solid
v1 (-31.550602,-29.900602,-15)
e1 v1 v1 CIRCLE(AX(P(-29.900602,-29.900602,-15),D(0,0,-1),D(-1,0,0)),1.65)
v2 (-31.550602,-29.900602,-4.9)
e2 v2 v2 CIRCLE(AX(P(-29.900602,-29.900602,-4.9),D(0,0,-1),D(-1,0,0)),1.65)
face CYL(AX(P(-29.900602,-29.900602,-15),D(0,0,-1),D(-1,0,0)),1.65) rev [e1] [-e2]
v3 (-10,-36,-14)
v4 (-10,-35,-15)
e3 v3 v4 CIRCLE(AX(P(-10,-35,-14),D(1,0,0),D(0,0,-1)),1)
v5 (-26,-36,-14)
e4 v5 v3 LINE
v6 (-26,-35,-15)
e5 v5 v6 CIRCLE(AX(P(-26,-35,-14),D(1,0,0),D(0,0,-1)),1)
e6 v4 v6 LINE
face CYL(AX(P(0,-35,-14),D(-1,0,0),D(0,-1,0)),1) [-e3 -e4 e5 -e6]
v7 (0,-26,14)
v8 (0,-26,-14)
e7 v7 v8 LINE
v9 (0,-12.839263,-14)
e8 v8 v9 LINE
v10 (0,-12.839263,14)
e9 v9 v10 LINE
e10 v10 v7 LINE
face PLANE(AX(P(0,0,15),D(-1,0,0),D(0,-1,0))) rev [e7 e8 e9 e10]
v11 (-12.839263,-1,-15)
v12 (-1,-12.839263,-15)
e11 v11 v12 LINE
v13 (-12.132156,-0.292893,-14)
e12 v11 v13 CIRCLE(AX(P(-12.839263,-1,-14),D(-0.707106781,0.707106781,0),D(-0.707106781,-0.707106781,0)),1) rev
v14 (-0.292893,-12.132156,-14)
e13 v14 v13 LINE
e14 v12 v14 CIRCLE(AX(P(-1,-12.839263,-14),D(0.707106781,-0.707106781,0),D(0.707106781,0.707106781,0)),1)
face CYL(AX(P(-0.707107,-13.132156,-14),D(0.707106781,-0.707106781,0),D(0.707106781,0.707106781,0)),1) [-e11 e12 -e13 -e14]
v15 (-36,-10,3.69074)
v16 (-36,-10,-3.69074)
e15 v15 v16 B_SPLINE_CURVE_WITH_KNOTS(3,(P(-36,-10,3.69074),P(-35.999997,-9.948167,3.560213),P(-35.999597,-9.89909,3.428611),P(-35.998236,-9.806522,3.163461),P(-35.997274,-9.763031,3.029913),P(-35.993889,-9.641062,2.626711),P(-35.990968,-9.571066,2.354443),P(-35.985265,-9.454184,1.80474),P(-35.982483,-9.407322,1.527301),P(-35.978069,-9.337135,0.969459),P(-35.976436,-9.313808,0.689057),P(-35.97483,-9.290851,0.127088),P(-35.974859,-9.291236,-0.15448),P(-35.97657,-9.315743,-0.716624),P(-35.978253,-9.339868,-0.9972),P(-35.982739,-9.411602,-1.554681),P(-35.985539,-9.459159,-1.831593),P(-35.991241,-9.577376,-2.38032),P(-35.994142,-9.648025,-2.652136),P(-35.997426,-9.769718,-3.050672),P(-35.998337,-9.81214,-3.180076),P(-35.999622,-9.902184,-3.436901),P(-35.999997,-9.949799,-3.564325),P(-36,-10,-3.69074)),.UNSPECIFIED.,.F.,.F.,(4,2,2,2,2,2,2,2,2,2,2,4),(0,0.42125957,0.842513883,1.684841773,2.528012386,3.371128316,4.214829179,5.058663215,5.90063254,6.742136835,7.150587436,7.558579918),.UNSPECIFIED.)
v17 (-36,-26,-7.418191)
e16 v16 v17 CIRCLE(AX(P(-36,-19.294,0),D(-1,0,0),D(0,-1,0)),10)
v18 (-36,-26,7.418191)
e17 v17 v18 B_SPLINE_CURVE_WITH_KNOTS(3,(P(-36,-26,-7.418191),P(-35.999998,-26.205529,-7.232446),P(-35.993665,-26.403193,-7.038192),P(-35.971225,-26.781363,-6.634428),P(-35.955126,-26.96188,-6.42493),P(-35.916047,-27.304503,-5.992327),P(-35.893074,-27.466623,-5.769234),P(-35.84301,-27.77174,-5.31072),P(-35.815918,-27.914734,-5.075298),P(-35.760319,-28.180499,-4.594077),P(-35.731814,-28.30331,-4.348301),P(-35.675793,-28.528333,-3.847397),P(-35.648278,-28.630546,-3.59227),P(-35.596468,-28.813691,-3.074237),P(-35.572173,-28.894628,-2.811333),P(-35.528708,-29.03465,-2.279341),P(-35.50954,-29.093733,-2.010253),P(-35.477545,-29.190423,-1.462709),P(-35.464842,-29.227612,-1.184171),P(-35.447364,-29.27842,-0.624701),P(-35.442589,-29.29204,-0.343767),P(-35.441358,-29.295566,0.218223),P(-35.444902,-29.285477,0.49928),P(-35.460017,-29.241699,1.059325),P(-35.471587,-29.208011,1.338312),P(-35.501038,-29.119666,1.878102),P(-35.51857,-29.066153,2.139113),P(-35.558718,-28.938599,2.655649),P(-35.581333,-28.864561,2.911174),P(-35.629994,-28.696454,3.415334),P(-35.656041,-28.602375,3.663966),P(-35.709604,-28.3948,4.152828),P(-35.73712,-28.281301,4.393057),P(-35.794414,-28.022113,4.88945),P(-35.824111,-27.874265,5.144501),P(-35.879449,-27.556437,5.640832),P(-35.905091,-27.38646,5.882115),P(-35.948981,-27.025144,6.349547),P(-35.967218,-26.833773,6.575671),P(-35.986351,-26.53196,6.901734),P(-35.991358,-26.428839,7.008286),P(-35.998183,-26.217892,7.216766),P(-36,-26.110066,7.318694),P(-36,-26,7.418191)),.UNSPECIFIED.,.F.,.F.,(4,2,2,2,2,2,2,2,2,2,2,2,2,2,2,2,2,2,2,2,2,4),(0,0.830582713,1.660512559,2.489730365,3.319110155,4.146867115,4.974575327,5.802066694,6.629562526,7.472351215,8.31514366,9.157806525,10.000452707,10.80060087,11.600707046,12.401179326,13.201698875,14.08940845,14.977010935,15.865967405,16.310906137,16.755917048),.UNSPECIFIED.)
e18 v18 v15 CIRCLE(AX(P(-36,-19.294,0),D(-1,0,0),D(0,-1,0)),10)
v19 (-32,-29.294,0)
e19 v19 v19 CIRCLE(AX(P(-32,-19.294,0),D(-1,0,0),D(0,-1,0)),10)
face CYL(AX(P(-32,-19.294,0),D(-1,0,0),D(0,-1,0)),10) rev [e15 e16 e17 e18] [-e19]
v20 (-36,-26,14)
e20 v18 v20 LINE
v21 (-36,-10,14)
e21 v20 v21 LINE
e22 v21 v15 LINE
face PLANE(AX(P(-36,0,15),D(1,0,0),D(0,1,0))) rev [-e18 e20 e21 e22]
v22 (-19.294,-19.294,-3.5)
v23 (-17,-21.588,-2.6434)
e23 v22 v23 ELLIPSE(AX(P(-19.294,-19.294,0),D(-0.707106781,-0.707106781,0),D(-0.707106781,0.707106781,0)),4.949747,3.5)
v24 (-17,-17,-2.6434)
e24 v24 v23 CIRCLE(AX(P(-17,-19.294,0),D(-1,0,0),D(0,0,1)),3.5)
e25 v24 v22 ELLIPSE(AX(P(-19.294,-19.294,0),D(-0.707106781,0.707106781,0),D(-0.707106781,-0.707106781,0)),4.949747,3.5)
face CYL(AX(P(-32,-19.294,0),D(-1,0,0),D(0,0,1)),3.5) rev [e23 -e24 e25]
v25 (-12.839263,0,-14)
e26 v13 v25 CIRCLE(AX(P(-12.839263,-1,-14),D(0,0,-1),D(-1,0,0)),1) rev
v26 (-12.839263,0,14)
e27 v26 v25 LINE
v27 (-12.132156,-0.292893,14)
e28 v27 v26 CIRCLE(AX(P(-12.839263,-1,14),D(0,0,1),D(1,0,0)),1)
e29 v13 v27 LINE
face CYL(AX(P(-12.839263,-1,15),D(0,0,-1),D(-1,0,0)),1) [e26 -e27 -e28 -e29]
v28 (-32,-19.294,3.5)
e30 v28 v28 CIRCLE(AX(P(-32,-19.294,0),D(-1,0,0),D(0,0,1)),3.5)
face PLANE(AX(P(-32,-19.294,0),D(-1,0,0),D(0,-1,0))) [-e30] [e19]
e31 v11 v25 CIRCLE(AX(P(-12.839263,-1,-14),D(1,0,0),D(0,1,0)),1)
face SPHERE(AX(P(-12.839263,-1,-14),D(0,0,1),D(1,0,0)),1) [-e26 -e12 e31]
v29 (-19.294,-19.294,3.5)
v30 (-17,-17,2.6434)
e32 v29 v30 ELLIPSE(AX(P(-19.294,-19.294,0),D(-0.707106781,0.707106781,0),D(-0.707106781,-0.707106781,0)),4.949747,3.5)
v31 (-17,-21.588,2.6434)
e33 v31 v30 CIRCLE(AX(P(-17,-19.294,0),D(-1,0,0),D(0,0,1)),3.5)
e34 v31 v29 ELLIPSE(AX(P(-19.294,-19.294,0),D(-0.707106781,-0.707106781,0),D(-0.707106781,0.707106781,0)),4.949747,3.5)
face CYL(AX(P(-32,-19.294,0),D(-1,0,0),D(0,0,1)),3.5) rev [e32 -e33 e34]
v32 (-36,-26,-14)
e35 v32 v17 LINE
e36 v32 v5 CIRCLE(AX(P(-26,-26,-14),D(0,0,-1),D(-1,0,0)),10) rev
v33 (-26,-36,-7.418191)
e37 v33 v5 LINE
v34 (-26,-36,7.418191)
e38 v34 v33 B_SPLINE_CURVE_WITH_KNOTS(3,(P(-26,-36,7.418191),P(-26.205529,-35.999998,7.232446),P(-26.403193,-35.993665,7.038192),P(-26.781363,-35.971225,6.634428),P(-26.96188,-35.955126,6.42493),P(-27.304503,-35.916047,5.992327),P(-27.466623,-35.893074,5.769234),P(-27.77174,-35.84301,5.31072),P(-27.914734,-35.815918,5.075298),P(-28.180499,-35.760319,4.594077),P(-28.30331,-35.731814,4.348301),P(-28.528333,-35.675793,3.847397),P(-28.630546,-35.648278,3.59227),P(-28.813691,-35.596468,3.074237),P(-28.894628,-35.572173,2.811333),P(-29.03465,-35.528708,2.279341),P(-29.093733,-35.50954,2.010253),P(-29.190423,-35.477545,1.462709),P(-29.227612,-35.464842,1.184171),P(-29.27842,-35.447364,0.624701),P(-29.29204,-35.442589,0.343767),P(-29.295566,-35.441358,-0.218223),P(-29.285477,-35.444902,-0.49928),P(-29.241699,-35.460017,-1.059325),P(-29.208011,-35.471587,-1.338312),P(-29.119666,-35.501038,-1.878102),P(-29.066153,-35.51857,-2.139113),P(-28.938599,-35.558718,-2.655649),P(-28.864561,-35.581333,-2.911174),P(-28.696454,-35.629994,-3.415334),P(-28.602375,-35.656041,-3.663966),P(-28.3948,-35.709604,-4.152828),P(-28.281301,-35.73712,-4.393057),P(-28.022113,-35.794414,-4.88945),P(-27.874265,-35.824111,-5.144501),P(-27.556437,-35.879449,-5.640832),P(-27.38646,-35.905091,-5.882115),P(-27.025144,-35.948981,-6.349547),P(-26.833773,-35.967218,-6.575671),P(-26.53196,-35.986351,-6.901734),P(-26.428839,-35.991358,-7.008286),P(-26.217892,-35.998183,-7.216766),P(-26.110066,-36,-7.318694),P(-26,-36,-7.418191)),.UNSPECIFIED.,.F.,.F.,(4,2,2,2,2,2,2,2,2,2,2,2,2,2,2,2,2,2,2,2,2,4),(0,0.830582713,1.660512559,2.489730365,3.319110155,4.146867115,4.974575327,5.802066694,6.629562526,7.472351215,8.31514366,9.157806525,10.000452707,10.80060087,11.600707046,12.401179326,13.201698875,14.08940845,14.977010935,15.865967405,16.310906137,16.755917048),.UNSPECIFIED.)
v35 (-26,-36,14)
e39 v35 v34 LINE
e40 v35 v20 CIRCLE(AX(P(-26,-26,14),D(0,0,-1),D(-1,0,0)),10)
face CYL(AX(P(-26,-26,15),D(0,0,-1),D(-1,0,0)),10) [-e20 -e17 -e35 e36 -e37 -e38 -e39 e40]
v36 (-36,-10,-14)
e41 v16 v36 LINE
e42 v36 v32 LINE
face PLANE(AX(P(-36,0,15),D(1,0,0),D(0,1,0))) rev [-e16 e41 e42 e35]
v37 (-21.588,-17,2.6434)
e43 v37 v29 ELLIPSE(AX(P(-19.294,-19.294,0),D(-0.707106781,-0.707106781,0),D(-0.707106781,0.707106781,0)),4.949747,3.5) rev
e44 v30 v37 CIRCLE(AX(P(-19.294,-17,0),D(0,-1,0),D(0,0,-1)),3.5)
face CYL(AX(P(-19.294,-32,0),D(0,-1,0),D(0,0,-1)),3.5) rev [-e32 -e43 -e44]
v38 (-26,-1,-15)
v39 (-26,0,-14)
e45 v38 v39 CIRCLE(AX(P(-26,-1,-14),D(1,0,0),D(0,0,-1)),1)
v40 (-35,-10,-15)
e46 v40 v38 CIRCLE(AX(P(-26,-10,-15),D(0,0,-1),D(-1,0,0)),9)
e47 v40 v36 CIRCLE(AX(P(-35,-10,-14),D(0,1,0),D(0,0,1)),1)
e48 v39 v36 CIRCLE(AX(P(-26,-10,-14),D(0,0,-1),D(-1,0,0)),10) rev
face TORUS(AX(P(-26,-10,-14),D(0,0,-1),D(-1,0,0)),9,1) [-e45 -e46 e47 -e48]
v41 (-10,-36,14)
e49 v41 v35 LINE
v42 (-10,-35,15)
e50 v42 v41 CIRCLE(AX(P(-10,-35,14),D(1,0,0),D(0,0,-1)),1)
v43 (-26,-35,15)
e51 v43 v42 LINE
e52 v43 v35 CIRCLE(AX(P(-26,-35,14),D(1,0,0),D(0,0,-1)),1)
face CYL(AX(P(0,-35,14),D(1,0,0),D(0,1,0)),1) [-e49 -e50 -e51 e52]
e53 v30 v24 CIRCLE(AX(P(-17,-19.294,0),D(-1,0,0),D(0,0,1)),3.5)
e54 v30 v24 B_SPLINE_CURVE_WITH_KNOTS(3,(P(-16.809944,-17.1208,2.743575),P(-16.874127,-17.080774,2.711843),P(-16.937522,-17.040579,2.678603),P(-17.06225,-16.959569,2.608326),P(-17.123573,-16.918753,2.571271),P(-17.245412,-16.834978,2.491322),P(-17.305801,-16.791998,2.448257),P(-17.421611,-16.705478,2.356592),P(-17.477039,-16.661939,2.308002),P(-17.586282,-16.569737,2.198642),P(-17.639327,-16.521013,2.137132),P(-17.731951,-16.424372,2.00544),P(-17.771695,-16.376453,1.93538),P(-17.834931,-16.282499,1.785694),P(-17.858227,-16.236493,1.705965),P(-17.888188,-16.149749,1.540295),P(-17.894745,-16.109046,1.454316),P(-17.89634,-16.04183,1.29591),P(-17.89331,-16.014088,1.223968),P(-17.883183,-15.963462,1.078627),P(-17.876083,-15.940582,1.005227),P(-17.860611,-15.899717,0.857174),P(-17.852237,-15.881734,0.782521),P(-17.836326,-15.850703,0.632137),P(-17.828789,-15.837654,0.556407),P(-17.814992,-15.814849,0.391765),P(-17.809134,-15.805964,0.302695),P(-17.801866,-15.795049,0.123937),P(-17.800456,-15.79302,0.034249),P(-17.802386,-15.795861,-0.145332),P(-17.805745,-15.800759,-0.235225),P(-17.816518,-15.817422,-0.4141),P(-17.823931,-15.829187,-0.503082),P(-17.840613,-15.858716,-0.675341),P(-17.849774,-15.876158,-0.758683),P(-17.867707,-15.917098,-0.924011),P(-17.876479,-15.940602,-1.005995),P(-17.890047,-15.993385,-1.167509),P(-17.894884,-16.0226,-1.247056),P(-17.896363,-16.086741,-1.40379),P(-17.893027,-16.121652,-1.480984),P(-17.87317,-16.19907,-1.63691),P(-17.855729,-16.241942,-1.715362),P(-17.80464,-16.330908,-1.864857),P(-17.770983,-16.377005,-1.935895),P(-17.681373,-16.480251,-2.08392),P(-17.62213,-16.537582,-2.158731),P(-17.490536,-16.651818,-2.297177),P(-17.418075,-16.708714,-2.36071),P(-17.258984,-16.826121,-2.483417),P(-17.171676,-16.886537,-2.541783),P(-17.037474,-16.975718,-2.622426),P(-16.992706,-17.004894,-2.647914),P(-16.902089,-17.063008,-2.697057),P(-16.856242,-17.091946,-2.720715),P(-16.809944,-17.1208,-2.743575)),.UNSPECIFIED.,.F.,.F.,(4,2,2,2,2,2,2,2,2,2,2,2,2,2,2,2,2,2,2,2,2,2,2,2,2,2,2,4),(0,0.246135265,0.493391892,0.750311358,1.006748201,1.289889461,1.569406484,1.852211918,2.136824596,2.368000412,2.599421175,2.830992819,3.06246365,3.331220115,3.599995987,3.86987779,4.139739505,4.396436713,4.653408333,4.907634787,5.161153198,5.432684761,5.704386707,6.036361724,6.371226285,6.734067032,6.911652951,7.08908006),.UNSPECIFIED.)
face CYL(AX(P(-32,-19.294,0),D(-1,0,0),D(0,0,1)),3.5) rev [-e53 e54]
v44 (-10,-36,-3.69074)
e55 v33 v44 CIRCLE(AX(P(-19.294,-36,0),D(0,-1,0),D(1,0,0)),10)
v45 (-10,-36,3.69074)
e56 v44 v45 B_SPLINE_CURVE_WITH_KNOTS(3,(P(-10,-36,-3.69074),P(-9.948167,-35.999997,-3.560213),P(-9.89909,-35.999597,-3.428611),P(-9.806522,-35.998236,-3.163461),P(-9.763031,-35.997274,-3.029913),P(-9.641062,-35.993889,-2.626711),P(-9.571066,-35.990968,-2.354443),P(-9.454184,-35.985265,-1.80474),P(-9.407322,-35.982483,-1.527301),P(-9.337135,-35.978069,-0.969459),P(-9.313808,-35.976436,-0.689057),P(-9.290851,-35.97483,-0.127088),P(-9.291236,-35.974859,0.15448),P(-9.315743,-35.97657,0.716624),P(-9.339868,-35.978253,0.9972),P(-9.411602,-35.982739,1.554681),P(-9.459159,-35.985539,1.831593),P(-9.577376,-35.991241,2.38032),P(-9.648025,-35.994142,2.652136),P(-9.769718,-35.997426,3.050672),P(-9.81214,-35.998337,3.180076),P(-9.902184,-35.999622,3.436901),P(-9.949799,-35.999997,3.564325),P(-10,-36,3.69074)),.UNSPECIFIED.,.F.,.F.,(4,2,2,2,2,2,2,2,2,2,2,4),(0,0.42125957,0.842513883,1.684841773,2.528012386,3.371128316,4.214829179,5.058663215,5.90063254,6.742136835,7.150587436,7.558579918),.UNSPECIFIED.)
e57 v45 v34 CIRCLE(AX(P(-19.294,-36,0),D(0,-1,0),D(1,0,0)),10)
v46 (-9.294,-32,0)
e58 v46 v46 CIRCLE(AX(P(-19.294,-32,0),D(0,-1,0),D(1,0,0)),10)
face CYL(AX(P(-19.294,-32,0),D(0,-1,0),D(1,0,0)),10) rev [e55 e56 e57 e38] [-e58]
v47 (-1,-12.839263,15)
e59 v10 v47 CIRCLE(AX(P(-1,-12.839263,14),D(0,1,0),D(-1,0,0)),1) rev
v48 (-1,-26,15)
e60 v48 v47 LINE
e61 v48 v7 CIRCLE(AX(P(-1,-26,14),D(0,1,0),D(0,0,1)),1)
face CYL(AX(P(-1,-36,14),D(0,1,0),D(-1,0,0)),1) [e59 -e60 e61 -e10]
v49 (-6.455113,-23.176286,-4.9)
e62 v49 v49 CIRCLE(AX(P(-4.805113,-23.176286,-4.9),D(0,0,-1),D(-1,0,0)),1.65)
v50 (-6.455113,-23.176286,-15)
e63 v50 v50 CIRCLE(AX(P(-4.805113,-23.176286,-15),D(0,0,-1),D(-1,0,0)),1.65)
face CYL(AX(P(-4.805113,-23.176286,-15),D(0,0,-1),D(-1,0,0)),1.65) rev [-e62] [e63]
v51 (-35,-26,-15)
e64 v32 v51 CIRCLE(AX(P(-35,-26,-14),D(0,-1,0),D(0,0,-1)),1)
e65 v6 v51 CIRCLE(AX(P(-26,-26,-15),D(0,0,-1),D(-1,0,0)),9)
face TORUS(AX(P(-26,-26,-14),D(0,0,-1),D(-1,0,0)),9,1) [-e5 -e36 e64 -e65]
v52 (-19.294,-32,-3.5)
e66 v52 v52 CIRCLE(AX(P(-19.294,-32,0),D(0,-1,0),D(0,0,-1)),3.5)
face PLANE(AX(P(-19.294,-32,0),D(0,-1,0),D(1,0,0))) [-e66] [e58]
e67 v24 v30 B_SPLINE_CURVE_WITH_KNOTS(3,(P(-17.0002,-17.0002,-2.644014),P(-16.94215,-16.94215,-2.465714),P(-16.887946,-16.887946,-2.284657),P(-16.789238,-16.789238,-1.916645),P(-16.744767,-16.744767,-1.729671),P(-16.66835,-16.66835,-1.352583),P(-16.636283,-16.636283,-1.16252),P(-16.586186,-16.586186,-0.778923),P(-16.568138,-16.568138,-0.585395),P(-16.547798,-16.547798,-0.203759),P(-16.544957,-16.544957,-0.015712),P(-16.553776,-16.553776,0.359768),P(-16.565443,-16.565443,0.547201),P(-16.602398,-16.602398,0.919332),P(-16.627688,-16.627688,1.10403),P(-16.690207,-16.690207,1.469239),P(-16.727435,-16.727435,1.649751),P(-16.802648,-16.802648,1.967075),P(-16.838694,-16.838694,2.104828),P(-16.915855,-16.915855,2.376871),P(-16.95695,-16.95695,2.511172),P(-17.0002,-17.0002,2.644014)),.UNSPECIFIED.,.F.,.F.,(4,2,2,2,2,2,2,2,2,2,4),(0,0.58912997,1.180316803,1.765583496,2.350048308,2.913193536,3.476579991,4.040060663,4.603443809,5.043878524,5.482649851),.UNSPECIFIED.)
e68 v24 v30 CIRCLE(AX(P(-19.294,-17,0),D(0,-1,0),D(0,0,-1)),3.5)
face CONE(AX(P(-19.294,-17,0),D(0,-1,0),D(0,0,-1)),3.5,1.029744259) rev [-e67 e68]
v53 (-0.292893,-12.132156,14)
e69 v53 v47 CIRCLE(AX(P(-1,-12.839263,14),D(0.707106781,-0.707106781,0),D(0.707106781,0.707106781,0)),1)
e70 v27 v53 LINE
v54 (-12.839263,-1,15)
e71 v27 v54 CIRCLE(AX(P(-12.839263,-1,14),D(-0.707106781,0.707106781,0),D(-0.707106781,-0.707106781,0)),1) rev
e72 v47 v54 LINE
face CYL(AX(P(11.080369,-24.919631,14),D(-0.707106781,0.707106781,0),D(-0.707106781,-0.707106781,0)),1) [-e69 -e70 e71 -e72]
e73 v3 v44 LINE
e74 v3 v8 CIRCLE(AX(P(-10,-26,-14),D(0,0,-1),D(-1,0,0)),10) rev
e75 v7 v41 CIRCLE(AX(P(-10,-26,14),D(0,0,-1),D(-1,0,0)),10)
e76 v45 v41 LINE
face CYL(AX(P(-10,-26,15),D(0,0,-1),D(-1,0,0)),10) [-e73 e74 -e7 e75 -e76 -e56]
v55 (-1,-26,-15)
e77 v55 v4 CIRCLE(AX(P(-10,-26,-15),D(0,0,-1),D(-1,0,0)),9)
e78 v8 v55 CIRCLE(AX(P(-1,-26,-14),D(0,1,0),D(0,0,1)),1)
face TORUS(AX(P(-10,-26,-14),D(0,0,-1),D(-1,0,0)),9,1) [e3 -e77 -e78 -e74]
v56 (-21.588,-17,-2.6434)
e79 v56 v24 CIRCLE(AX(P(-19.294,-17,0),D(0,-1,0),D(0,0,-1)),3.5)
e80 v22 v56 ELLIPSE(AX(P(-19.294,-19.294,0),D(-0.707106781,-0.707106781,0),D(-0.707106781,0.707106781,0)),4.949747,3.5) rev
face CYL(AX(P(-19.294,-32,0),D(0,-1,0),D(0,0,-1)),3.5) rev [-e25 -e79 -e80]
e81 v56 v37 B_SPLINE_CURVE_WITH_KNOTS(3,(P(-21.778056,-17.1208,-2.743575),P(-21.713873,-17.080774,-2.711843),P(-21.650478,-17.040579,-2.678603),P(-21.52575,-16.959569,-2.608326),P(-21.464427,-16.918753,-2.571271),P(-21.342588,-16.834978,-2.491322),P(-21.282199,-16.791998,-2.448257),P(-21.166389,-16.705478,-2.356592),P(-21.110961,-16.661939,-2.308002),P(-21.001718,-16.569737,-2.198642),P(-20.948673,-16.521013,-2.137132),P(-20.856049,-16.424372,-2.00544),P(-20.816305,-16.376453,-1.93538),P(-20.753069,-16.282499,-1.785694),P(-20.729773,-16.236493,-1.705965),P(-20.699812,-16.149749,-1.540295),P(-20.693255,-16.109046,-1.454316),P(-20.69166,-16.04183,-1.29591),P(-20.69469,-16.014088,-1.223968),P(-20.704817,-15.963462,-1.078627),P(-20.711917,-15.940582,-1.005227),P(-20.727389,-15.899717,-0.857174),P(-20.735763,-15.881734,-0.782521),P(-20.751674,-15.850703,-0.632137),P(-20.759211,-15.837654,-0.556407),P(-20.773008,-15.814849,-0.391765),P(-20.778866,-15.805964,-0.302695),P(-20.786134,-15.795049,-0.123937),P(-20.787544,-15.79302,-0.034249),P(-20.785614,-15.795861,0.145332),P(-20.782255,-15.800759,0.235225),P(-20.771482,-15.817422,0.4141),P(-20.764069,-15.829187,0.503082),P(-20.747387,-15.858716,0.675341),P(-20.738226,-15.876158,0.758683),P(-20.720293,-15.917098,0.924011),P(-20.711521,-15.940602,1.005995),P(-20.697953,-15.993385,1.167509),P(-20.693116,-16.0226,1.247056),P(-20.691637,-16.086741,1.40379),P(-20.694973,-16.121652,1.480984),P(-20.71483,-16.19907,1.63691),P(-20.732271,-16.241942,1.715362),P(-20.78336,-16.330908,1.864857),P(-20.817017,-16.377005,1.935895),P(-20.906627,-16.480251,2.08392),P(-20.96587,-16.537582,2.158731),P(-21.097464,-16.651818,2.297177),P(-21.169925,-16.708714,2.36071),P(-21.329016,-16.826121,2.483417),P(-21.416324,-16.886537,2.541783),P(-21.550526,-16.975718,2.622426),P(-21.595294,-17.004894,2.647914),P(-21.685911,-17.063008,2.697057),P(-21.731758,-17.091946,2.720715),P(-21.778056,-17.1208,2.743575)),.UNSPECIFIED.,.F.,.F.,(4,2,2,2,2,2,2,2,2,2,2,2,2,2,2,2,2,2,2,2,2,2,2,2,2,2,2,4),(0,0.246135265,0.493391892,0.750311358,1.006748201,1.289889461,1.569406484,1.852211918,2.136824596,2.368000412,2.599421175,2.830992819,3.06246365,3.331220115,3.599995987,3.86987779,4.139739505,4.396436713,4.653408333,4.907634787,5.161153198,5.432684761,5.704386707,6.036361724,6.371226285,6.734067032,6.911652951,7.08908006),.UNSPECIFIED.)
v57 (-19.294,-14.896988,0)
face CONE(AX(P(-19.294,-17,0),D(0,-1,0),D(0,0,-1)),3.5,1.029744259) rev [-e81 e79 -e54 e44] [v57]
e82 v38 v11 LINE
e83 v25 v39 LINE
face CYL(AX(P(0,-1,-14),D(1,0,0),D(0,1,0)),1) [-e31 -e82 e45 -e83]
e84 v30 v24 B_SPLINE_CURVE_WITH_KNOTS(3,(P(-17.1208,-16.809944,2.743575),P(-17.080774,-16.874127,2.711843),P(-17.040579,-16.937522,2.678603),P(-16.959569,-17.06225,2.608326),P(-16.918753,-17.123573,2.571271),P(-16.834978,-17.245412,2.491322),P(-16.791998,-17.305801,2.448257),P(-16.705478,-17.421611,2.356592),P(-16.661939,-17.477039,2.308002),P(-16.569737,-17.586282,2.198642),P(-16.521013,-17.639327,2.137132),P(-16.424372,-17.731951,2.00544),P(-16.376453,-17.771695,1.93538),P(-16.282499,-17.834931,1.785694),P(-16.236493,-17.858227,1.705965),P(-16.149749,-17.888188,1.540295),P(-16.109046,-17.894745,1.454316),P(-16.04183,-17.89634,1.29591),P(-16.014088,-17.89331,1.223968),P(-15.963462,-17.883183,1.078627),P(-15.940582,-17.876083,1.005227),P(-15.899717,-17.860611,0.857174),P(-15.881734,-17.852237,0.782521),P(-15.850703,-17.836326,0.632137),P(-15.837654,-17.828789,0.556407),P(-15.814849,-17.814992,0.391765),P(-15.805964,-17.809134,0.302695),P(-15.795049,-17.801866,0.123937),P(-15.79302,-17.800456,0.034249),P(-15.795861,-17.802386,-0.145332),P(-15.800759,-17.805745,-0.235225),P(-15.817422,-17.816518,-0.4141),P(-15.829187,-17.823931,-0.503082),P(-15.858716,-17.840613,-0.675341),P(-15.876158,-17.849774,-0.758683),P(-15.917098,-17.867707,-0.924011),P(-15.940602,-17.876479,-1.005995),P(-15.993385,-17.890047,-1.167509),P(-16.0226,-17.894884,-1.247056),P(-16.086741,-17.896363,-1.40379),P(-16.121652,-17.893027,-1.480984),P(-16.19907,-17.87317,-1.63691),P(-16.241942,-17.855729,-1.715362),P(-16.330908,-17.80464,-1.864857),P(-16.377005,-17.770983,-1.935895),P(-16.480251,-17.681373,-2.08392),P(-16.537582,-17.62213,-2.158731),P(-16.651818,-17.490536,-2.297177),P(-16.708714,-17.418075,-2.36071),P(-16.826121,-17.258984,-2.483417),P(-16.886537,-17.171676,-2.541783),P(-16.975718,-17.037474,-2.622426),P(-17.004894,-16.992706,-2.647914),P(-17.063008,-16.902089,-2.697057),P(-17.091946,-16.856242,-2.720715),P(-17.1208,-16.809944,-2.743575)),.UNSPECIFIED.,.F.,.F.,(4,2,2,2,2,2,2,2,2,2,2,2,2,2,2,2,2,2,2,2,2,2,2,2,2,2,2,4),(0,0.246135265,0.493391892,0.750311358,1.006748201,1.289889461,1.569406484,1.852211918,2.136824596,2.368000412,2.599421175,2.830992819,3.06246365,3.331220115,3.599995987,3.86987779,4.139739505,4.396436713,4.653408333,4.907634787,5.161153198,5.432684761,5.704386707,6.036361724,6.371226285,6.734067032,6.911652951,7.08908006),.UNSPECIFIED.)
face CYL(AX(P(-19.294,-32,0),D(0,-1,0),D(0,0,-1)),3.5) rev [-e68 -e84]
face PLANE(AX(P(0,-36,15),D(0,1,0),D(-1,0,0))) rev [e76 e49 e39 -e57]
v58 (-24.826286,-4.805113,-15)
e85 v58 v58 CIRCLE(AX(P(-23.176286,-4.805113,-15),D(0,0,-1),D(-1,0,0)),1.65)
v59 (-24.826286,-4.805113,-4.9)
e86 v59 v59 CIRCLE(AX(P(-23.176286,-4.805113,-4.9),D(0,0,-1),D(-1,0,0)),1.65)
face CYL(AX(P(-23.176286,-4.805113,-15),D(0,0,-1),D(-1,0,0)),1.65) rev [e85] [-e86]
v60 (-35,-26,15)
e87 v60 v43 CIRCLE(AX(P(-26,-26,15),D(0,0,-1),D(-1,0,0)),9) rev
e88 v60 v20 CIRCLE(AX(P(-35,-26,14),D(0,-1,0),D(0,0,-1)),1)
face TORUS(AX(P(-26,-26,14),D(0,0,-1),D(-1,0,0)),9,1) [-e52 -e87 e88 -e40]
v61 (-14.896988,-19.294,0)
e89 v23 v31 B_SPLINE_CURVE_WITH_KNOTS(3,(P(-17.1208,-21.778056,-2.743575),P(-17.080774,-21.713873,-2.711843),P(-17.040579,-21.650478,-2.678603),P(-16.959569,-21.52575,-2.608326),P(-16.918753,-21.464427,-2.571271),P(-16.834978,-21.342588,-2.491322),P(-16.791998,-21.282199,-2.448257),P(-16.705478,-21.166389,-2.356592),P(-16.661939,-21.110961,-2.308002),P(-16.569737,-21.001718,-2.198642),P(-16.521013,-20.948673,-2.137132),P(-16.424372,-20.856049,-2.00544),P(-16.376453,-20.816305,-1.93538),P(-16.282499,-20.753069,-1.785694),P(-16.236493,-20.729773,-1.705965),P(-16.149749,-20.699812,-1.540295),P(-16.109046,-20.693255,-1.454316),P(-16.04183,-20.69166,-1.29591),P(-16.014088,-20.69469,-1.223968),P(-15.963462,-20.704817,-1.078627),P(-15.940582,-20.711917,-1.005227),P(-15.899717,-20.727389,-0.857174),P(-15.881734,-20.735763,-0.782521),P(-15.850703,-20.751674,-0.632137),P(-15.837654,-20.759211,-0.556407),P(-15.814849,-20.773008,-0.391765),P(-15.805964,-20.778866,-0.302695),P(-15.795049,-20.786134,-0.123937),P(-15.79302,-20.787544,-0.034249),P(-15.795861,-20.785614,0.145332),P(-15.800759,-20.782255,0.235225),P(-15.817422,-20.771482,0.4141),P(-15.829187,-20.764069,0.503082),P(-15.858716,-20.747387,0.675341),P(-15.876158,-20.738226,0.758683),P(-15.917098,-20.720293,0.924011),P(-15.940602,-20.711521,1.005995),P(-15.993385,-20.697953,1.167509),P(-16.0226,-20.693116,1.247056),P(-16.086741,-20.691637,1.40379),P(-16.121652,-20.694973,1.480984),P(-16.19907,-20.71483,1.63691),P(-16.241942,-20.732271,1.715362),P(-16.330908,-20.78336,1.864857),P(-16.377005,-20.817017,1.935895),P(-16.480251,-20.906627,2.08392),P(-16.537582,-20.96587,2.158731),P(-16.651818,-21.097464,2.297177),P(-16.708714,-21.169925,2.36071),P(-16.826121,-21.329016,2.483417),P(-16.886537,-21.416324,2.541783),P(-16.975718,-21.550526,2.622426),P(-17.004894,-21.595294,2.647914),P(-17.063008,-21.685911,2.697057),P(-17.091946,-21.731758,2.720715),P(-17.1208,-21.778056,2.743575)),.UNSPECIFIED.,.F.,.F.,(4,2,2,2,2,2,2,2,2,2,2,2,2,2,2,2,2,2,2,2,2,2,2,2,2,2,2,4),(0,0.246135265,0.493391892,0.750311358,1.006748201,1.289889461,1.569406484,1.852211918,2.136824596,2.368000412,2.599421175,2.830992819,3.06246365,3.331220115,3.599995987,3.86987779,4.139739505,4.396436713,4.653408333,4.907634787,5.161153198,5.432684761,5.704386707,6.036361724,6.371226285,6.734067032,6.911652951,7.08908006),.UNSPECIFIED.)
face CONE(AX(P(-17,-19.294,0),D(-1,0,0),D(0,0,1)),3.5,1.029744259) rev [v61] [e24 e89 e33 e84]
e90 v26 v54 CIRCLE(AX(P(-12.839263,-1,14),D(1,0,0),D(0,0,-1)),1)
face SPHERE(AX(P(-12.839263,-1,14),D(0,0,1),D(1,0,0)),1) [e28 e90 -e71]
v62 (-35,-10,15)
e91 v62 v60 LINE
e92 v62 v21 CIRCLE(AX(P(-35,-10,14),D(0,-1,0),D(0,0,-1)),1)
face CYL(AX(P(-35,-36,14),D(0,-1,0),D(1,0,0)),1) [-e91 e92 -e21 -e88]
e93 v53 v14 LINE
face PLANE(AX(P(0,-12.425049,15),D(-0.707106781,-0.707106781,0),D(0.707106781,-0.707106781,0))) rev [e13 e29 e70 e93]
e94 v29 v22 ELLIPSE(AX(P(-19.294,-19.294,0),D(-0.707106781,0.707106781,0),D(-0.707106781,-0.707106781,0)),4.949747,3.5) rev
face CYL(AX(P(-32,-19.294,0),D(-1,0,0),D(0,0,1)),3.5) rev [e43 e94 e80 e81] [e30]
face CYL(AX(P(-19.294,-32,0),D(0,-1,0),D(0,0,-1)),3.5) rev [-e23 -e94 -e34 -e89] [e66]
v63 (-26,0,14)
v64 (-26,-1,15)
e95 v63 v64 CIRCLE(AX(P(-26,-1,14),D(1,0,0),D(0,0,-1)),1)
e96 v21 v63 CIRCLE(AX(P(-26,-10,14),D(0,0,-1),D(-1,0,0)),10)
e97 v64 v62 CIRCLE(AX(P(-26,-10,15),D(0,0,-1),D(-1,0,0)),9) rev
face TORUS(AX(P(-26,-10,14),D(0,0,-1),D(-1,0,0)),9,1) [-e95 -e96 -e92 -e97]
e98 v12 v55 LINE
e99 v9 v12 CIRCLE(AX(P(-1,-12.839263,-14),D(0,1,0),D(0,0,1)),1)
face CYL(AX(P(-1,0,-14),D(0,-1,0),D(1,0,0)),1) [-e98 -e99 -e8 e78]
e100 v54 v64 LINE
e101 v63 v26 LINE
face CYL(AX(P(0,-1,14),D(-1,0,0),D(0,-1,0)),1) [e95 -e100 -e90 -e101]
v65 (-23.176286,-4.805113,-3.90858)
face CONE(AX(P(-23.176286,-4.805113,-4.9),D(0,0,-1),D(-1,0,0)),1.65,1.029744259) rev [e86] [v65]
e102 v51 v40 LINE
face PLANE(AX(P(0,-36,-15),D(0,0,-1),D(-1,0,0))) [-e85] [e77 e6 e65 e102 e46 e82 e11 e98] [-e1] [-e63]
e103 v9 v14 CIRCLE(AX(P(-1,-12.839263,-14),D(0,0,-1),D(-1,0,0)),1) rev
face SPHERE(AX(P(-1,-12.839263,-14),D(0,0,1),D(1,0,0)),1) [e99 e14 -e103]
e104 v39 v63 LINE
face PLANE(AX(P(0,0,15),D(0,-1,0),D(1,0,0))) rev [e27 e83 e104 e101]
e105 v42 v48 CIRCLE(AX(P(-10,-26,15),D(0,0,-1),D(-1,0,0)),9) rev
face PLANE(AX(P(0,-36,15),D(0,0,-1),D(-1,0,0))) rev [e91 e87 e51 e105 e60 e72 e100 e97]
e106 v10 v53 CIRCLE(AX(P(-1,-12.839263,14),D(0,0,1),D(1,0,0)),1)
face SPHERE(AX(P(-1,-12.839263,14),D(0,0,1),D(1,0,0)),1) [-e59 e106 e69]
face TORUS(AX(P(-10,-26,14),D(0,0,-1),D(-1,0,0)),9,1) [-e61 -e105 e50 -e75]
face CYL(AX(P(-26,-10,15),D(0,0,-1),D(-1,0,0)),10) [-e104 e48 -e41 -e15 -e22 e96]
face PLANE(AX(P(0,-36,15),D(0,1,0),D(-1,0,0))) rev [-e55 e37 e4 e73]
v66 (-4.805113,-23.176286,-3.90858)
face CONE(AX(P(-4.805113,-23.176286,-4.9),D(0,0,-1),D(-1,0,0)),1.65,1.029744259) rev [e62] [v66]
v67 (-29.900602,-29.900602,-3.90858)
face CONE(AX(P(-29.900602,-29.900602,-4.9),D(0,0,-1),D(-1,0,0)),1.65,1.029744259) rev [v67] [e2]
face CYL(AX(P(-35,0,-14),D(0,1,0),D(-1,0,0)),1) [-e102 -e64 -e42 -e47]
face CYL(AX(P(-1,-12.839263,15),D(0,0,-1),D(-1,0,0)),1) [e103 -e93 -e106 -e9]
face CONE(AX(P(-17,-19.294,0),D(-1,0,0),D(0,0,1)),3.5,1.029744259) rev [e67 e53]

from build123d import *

# Parameters (mm, degrees)
SKETCH1_W                 = 36
SKETCH1_H                 = 36
BOSS_EXTRUDE1_DEPTH       = 15
SKETCH2_R                 = 10
CUT_EXTRUDE1_DEPTH        = 4
SKETCH4_R                 = 10
CUT_EXTRUDE2_DEPTH        = 4
M8X1_0_TAPPED_HOLE1_D     = 7
M8X1_0_TAPPED_HOLE1_DEPTH = 15
M8X1_0_TAPPED_HOLE1_TIP   = 2.103012167
M8X1_0_TAPPED_HOLE2_D     = 7
M8X1_0_TAPPED_HOLE2_DEPTH = 15
M8X1_0_TAPPED_HOLE2_TIP   = 2.103012167
FILLET1_R                 = 10
M4X0_7_TAPPED_HOLE1_D     = 3.3
M4X0_7_TAPPED_HOLE1_DEPTH = 10.1
M4X0_7_TAPPED_HOLE1_TIP   = 0.991420021
CUT_EXTRUDE3_DEPTH        = 60.093146983
FILLET2_R                 = 1


with BuildPart() as part:
    # Sketch1 → Boss-Extrude1 (new, symmetric)
    with BuildSketch(Plane.XY):
        with Locations((-18, -18)):
            Rectangle(SKETCH1_W, SKETCH1_H)
    extrude(amount=BOSS_EXTRUDE1_DEPTH, both=True)

    # Sketch2 → Cut-Extrude1 (cut)
    with BuildSketch(Plane.XZ.offset(36)):
        with Locations((-19.294, 0)):
            Circle(SKETCH2_R)
    extrude(amount=-CUT_EXTRUDE1_DEPTH, mode=Mode.SUBTRACT)

    # Sketch4 → Cut-Extrude2 (cut)
    with BuildSketch(Plane.ZY.offset(36)):
        with Locations(Location((0, -19.294, 0), (0, 0, 270))):
            Circle(SKETCH4_R)
    extrude(amount=-CUT_EXTRUDE2_DEPTH, mode=Mode.SUBTRACT)

    # M8x1.0 Tapped Hole1
    with Locations(Plane.ZY.offset(32)):
        with Locations((0, -19.294)):
            Hole(M8X1_0_TAPPED_HOLE1_D / 2, depth=M8X1_0_TAPPED_HOLE1_DEPTH)
            with Locations((0, 0, -(M8X1_0_TAPPED_HOLE1_DEPTH + M8X1_0_TAPPED_HOLE1_TIP / 2))):  # 118° drill point
                Cone(0, M8X1_0_TAPPED_HOLE1_D / 2, M8X1_0_TAPPED_HOLE1_TIP, mode=Mode.SUBTRACT)

    # M8x1.0 Tapped Hole2
    with Locations(Plane.XZ.offset(32)):
        with Locations((-19.294, 0)):
            Hole(M8X1_0_TAPPED_HOLE2_D / 2, depth=M8X1_0_TAPPED_HOLE2_DEPTH)
            with Locations((0, 0, -(M8X1_0_TAPPED_HOLE2_DEPTH + M8X1_0_TAPPED_HOLE2_TIP / 2))):  # 118° drill point
                Cone(0, M8X1_0_TAPPED_HOLE2_D / 2, M8X1_0_TAPPED_HOLE2_TIP, mode=Mode.SUBTRACT)

    # Fillet1
    # the kernel refuses this fillet: 10 mm, written as the material it takes off along each edge
    with BuildSketch(Plane(origin=(0, -36, 40), x_dir=(0, 1, 0), z_dir=(0, 0, -1)), Plane(origin=(-36, 0, -40), x_dir=(1, 0, 0), z_dir=(0, 0, 1))) as fillet1_piece_1:
        with BuildLine():
            CenterArc((FILLET1_R, -FILLET1_R), FILLET1_R, 90, 90)
            Line((0, -FILLET1_R), (0, 0))
            Line((0, 0), (FILLET1_R, 0))
        make_face()
    extrude(amount=80, mode=Mode.SUBTRACT)
    with BuildSketch(Plane(origin=(-36, -36, -40), x_dir=(1, 0, 0), z_dir=(0, 0, 1))) as fillet1_piece_2:
        with BuildLine():
            CenterArc((FILLET1_R, FILLET1_R), FILLET1_R, 180, 90)
            Line((0, FILLET1_R), (0, 0))
            Line((0, 0), (FILLET1_R, 0))
        make_face()
    extrude(amount=80, mode=Mode.SUBTRACT)

    # M4x0.7 Tapped Hole1
    with Locations(Plane(origin=(0, 0, -15), x_dir=(-1, 0, 0), z_dir=(0, 0, -1))):
        with Locations((29.900601718, -29.900601718), (4.805112606, -23.176285677), (23.176285677, -4.805112606)):
            Hole(M4X0_7_TAPPED_HOLE1_D / 2, depth=M4X0_7_TAPPED_HOLE1_DEPTH)
            with Locations((0, 0, -(M4X0_7_TAPPED_HOLE1_DEPTH + M4X0_7_TAPPED_HOLE1_TIP / 2))):  # 118° drill point
                Cone(0, M4X0_7_TAPPED_HOLE1_D / 2, M4X0_7_TAPPED_HOLE1_TIP, mode=Mode.SUBTRACT)

    # Sketch12 → Cut-Extrude3 (cut, through all)
    with BuildSketch(Plane(origin=(0, 0, -15), x_dir=(-1, 0, 0), z_dir=(0, 0, -1))):
        Polygon((0, -12.425049096), (12.425049096, 0), (0, 0), align=None)
    extrude(amount=-CUT_EXTRUDE3_DEPTH, mode=Mode.SUBTRACT)

    # Fillet2
    fillet2_edges = [part.edges().sort_by_distance(p)[0] for p in [
        (0, -12.425049096, 0),
        (-6.212524548, -6.212524548, 15),
        (-12.425049096, 0, 0),
        (-6.212524548, -6.212524548, -15),
        (-36, -18, -15),
        (-36, -18, 15),
        (0, -19.212524548, -15),
        (-18, -36, -15),
        (-33.071067812, -33.071067812, -15),
        (-2.928932188, -33.071067812, -15),
        (-33.071067812, -2.928932188, -15),
        (0, -19.212524548, 15),
        (-18, -36, 15),
        (-33.071067812, -33.071067812, 15),
        (-2.928932188, -33.071067812, 15),
        (-33.071067812, -2.928932188, 15),
        (-19.212524548, 0, -15),
        (-19.212524548, 0, 15),
    ]]
    fillet(fillet2_edges, radius=FILLET2_R)


solid = part.part
